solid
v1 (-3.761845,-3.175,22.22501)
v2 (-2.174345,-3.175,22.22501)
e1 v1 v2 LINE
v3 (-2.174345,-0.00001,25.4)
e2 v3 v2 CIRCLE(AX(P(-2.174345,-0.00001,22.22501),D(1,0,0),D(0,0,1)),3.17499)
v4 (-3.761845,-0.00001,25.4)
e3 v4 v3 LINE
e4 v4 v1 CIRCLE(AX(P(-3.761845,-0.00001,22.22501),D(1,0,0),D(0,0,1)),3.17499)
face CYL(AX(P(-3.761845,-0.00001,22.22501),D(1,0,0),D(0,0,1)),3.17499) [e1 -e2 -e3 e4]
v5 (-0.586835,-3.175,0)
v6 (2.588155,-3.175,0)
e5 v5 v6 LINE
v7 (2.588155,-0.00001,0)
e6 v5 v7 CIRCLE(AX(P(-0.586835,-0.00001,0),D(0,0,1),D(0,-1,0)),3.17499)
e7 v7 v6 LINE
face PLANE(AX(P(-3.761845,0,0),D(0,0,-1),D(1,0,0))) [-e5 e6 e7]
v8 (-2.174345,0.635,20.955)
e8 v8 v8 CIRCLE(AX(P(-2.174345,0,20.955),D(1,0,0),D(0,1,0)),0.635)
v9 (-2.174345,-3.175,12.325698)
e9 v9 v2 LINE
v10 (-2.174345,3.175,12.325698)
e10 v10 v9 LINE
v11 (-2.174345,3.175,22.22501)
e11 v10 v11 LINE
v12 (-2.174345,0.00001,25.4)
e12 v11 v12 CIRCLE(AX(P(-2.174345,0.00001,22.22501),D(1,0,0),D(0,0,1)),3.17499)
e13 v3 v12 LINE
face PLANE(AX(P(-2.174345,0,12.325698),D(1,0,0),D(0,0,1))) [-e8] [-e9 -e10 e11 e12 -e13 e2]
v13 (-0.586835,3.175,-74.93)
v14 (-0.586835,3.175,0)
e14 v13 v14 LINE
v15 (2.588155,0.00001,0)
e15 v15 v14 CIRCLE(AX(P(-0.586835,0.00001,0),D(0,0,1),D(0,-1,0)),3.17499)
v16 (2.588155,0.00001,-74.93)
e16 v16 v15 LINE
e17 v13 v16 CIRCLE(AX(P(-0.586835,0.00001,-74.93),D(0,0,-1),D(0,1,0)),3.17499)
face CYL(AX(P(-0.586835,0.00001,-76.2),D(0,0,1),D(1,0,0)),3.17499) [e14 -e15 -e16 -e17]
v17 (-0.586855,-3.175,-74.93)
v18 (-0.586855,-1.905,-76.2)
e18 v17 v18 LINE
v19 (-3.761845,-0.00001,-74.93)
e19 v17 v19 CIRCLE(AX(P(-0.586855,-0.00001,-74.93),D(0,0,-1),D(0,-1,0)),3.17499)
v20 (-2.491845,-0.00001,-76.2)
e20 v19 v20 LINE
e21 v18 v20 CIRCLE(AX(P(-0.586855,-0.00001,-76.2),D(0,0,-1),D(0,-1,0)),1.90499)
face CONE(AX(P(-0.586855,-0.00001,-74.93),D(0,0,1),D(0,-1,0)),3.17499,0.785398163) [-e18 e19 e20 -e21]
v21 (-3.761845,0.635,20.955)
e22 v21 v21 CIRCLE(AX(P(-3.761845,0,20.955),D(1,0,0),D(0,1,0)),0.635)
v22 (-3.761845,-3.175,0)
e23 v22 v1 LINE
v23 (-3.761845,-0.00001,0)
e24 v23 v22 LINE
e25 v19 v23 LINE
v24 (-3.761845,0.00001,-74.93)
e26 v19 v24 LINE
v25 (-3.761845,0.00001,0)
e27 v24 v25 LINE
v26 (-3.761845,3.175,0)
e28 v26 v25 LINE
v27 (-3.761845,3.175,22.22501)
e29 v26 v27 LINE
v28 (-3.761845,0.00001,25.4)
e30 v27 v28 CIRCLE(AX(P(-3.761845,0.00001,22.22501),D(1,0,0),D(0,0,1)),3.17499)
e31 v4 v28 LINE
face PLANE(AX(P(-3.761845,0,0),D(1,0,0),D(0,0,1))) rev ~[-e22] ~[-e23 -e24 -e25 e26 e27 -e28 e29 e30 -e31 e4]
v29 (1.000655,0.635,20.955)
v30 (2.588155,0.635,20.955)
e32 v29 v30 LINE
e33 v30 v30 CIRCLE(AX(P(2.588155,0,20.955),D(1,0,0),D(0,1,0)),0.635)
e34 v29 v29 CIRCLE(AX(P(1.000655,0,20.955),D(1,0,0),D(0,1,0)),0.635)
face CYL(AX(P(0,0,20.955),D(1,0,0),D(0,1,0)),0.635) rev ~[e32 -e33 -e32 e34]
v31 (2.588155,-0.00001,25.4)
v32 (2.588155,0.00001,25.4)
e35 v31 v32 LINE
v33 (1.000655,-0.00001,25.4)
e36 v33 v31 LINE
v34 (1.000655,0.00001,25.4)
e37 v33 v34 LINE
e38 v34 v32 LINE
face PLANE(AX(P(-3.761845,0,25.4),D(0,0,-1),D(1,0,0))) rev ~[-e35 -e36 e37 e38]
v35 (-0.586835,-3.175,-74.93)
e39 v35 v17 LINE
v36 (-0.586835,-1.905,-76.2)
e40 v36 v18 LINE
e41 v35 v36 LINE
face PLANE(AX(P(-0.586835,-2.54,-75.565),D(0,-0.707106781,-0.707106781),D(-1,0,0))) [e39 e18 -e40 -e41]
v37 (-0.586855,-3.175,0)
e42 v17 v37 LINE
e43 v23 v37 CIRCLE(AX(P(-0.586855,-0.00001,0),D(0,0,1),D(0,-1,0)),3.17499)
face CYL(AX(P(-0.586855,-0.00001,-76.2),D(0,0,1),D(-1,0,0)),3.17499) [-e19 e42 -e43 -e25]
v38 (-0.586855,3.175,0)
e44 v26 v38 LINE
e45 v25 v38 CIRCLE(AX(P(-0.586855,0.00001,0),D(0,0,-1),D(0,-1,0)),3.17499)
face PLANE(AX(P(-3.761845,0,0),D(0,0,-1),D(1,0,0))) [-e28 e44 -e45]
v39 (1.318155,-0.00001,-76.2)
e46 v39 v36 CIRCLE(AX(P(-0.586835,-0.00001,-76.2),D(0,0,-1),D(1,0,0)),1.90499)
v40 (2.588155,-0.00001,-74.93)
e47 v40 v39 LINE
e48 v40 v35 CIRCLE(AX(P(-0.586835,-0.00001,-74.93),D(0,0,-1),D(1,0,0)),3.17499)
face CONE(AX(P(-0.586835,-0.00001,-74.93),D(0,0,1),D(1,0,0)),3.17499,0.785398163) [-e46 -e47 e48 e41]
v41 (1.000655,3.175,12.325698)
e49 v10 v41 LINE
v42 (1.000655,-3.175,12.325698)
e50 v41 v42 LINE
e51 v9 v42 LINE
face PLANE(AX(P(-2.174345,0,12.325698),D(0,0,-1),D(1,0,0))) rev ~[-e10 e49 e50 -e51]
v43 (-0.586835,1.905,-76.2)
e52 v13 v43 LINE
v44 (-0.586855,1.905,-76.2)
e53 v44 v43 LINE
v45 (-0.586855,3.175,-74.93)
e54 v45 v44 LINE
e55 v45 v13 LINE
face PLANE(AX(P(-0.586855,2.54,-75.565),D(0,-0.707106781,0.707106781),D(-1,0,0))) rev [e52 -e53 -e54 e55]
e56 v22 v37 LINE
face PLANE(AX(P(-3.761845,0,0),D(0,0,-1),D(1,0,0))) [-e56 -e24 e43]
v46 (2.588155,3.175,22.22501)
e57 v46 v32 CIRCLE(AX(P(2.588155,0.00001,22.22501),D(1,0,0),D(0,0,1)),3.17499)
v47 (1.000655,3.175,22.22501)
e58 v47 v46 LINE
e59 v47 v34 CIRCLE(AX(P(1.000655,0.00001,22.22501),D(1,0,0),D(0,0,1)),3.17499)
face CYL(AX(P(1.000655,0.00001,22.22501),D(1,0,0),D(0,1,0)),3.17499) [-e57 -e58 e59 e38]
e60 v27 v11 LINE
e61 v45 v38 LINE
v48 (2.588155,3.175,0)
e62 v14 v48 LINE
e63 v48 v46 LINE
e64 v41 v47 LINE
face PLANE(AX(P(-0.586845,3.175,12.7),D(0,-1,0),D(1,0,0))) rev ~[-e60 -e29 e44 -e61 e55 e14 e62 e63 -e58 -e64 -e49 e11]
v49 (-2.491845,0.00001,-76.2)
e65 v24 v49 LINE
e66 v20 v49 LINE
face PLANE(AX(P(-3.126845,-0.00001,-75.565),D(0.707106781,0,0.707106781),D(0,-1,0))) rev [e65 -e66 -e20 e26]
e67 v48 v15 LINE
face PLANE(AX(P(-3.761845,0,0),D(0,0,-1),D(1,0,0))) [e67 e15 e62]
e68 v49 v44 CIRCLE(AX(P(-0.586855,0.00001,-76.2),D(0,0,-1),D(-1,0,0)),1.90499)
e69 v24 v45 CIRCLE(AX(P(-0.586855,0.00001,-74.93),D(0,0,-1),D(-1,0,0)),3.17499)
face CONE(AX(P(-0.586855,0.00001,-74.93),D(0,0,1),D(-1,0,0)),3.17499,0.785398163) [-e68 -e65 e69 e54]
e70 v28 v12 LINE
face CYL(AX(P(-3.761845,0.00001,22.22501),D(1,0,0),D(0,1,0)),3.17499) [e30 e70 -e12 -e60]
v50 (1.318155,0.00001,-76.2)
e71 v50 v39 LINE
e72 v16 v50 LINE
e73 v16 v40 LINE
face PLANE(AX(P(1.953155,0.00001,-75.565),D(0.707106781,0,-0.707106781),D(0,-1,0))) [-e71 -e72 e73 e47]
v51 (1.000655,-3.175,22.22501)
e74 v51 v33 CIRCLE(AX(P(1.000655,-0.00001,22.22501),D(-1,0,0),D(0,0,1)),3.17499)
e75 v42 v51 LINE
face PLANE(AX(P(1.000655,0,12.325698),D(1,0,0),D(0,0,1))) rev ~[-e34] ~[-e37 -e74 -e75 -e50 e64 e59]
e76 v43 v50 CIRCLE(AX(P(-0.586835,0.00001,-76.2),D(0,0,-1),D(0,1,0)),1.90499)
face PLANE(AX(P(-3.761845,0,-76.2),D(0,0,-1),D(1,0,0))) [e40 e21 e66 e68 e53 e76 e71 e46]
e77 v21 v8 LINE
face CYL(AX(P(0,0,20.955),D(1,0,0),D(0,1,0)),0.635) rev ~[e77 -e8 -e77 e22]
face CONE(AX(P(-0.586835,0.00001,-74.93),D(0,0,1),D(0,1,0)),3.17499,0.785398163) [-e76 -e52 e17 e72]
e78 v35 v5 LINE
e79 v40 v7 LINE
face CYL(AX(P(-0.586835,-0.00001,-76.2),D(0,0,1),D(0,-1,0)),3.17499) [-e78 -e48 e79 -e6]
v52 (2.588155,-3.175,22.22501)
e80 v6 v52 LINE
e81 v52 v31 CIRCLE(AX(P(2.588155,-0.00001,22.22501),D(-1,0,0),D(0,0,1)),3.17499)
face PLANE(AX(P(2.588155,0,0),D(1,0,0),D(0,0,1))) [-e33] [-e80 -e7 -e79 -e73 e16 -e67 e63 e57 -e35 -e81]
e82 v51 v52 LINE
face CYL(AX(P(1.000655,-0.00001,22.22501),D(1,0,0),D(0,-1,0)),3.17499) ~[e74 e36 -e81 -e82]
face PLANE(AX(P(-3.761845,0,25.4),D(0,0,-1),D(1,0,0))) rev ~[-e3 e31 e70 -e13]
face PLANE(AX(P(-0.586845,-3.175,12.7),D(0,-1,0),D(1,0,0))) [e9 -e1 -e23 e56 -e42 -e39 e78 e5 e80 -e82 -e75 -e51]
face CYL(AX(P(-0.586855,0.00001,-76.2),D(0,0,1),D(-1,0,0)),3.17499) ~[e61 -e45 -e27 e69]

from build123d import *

# Parameters (mm, degrees)
F0_W     = 6.35
F0_H     = 76.2
F1_DEPTH = 3.175
F2_R     = 3.17499
F3_W     = 6.35
F3_H     = 25.4
F5_DEPTH = 3.175
F4_W     = 3.175
F4_H     = 13.0743015936
F6_DEPTH = 5.08
F7_R     = 0.635
F8_DEPTH = 3.81
F9_R     = 3.17499
F10_SIZE = 1.27


# Not quite as in the source:
# - a fillet or chamfer is up to 0.001 mm smaller than in the source, because OpenCascade refuses the exact size


with BuildPart() as f1:
    # F0 (on Front) → F1 (new body, symmetric)
    with BuildSketch(Plane.XZ):
        with Locations((-0.5868453211, -38.1)):
            Rectangle(F0_W, F0_H)
    extrude(amount=F1_DEPTH, both=True)

    # F2 (radius 3.175 in the source; OpenCascade refuses exactly that, so slightly less here)
    f2_edges = [f1.edges().sort_by_distance(p)[0] for p in [
        (2.588155, -3.175, -38.1),
        (2.588155, 3.175, -38.1),
        (-3.761845, -3.175, -38.1),
        (-3.761845, 3.175, -38.1),
    ]]
    fillet(f2_edges, radius=F2_R)

    # F3 (on Front) → F5 (join, symmetric)
    with BuildSketch(Plane.XZ):
        with Locations((-0.5868453211, 12.7)):
            Rectangle(F3_W, F3_H)
    extrude(amount=F5_DEPTH, both=True)

    # F4 (on Front) → F6 (cut, symmetric)
    with BuildSketch(Plane.XZ):
        with Locations((-0.5868453211, 18.8628492032)):
            Rectangle(F4_W, F4_H)
    extrude(amount=F6_DEPTH, both=True, mode=Mode.SUBTRACT)

    # F7 (on Right) → F8 (cut, symmetric)
    with BuildSketch(Plane.YZ):
        with Locations((0, 20.955)):
            Circle(F7_R)
    extrude(amount=F8_DEPTH, both=True, mode=Mode.SUBTRACT)

    # F9 (radius 3.175 in the source; OpenCascade refuses exactly that, so slightly less here)
    f9_edges = [f1.edges().sort_by_distance(p)[0] for p in [
        (-2.968095, -3.175, 25.4),
        (1.794405, -3.175, 25.4),
        (1.794405, 3.175, 25.4),
        (-2.968095, 3.175, 25.4),
    ]]
    fillet(f9_edges, radius=F9_R)

    # F10
    f10_edges = [f1.edges().sort_by_distance(p)[0] for p in [
        (-2.831912, 2.245067, -76.2),
    ]]
    chamfer(f10_edges, length=F10_SIZE)


solid = f1.part
